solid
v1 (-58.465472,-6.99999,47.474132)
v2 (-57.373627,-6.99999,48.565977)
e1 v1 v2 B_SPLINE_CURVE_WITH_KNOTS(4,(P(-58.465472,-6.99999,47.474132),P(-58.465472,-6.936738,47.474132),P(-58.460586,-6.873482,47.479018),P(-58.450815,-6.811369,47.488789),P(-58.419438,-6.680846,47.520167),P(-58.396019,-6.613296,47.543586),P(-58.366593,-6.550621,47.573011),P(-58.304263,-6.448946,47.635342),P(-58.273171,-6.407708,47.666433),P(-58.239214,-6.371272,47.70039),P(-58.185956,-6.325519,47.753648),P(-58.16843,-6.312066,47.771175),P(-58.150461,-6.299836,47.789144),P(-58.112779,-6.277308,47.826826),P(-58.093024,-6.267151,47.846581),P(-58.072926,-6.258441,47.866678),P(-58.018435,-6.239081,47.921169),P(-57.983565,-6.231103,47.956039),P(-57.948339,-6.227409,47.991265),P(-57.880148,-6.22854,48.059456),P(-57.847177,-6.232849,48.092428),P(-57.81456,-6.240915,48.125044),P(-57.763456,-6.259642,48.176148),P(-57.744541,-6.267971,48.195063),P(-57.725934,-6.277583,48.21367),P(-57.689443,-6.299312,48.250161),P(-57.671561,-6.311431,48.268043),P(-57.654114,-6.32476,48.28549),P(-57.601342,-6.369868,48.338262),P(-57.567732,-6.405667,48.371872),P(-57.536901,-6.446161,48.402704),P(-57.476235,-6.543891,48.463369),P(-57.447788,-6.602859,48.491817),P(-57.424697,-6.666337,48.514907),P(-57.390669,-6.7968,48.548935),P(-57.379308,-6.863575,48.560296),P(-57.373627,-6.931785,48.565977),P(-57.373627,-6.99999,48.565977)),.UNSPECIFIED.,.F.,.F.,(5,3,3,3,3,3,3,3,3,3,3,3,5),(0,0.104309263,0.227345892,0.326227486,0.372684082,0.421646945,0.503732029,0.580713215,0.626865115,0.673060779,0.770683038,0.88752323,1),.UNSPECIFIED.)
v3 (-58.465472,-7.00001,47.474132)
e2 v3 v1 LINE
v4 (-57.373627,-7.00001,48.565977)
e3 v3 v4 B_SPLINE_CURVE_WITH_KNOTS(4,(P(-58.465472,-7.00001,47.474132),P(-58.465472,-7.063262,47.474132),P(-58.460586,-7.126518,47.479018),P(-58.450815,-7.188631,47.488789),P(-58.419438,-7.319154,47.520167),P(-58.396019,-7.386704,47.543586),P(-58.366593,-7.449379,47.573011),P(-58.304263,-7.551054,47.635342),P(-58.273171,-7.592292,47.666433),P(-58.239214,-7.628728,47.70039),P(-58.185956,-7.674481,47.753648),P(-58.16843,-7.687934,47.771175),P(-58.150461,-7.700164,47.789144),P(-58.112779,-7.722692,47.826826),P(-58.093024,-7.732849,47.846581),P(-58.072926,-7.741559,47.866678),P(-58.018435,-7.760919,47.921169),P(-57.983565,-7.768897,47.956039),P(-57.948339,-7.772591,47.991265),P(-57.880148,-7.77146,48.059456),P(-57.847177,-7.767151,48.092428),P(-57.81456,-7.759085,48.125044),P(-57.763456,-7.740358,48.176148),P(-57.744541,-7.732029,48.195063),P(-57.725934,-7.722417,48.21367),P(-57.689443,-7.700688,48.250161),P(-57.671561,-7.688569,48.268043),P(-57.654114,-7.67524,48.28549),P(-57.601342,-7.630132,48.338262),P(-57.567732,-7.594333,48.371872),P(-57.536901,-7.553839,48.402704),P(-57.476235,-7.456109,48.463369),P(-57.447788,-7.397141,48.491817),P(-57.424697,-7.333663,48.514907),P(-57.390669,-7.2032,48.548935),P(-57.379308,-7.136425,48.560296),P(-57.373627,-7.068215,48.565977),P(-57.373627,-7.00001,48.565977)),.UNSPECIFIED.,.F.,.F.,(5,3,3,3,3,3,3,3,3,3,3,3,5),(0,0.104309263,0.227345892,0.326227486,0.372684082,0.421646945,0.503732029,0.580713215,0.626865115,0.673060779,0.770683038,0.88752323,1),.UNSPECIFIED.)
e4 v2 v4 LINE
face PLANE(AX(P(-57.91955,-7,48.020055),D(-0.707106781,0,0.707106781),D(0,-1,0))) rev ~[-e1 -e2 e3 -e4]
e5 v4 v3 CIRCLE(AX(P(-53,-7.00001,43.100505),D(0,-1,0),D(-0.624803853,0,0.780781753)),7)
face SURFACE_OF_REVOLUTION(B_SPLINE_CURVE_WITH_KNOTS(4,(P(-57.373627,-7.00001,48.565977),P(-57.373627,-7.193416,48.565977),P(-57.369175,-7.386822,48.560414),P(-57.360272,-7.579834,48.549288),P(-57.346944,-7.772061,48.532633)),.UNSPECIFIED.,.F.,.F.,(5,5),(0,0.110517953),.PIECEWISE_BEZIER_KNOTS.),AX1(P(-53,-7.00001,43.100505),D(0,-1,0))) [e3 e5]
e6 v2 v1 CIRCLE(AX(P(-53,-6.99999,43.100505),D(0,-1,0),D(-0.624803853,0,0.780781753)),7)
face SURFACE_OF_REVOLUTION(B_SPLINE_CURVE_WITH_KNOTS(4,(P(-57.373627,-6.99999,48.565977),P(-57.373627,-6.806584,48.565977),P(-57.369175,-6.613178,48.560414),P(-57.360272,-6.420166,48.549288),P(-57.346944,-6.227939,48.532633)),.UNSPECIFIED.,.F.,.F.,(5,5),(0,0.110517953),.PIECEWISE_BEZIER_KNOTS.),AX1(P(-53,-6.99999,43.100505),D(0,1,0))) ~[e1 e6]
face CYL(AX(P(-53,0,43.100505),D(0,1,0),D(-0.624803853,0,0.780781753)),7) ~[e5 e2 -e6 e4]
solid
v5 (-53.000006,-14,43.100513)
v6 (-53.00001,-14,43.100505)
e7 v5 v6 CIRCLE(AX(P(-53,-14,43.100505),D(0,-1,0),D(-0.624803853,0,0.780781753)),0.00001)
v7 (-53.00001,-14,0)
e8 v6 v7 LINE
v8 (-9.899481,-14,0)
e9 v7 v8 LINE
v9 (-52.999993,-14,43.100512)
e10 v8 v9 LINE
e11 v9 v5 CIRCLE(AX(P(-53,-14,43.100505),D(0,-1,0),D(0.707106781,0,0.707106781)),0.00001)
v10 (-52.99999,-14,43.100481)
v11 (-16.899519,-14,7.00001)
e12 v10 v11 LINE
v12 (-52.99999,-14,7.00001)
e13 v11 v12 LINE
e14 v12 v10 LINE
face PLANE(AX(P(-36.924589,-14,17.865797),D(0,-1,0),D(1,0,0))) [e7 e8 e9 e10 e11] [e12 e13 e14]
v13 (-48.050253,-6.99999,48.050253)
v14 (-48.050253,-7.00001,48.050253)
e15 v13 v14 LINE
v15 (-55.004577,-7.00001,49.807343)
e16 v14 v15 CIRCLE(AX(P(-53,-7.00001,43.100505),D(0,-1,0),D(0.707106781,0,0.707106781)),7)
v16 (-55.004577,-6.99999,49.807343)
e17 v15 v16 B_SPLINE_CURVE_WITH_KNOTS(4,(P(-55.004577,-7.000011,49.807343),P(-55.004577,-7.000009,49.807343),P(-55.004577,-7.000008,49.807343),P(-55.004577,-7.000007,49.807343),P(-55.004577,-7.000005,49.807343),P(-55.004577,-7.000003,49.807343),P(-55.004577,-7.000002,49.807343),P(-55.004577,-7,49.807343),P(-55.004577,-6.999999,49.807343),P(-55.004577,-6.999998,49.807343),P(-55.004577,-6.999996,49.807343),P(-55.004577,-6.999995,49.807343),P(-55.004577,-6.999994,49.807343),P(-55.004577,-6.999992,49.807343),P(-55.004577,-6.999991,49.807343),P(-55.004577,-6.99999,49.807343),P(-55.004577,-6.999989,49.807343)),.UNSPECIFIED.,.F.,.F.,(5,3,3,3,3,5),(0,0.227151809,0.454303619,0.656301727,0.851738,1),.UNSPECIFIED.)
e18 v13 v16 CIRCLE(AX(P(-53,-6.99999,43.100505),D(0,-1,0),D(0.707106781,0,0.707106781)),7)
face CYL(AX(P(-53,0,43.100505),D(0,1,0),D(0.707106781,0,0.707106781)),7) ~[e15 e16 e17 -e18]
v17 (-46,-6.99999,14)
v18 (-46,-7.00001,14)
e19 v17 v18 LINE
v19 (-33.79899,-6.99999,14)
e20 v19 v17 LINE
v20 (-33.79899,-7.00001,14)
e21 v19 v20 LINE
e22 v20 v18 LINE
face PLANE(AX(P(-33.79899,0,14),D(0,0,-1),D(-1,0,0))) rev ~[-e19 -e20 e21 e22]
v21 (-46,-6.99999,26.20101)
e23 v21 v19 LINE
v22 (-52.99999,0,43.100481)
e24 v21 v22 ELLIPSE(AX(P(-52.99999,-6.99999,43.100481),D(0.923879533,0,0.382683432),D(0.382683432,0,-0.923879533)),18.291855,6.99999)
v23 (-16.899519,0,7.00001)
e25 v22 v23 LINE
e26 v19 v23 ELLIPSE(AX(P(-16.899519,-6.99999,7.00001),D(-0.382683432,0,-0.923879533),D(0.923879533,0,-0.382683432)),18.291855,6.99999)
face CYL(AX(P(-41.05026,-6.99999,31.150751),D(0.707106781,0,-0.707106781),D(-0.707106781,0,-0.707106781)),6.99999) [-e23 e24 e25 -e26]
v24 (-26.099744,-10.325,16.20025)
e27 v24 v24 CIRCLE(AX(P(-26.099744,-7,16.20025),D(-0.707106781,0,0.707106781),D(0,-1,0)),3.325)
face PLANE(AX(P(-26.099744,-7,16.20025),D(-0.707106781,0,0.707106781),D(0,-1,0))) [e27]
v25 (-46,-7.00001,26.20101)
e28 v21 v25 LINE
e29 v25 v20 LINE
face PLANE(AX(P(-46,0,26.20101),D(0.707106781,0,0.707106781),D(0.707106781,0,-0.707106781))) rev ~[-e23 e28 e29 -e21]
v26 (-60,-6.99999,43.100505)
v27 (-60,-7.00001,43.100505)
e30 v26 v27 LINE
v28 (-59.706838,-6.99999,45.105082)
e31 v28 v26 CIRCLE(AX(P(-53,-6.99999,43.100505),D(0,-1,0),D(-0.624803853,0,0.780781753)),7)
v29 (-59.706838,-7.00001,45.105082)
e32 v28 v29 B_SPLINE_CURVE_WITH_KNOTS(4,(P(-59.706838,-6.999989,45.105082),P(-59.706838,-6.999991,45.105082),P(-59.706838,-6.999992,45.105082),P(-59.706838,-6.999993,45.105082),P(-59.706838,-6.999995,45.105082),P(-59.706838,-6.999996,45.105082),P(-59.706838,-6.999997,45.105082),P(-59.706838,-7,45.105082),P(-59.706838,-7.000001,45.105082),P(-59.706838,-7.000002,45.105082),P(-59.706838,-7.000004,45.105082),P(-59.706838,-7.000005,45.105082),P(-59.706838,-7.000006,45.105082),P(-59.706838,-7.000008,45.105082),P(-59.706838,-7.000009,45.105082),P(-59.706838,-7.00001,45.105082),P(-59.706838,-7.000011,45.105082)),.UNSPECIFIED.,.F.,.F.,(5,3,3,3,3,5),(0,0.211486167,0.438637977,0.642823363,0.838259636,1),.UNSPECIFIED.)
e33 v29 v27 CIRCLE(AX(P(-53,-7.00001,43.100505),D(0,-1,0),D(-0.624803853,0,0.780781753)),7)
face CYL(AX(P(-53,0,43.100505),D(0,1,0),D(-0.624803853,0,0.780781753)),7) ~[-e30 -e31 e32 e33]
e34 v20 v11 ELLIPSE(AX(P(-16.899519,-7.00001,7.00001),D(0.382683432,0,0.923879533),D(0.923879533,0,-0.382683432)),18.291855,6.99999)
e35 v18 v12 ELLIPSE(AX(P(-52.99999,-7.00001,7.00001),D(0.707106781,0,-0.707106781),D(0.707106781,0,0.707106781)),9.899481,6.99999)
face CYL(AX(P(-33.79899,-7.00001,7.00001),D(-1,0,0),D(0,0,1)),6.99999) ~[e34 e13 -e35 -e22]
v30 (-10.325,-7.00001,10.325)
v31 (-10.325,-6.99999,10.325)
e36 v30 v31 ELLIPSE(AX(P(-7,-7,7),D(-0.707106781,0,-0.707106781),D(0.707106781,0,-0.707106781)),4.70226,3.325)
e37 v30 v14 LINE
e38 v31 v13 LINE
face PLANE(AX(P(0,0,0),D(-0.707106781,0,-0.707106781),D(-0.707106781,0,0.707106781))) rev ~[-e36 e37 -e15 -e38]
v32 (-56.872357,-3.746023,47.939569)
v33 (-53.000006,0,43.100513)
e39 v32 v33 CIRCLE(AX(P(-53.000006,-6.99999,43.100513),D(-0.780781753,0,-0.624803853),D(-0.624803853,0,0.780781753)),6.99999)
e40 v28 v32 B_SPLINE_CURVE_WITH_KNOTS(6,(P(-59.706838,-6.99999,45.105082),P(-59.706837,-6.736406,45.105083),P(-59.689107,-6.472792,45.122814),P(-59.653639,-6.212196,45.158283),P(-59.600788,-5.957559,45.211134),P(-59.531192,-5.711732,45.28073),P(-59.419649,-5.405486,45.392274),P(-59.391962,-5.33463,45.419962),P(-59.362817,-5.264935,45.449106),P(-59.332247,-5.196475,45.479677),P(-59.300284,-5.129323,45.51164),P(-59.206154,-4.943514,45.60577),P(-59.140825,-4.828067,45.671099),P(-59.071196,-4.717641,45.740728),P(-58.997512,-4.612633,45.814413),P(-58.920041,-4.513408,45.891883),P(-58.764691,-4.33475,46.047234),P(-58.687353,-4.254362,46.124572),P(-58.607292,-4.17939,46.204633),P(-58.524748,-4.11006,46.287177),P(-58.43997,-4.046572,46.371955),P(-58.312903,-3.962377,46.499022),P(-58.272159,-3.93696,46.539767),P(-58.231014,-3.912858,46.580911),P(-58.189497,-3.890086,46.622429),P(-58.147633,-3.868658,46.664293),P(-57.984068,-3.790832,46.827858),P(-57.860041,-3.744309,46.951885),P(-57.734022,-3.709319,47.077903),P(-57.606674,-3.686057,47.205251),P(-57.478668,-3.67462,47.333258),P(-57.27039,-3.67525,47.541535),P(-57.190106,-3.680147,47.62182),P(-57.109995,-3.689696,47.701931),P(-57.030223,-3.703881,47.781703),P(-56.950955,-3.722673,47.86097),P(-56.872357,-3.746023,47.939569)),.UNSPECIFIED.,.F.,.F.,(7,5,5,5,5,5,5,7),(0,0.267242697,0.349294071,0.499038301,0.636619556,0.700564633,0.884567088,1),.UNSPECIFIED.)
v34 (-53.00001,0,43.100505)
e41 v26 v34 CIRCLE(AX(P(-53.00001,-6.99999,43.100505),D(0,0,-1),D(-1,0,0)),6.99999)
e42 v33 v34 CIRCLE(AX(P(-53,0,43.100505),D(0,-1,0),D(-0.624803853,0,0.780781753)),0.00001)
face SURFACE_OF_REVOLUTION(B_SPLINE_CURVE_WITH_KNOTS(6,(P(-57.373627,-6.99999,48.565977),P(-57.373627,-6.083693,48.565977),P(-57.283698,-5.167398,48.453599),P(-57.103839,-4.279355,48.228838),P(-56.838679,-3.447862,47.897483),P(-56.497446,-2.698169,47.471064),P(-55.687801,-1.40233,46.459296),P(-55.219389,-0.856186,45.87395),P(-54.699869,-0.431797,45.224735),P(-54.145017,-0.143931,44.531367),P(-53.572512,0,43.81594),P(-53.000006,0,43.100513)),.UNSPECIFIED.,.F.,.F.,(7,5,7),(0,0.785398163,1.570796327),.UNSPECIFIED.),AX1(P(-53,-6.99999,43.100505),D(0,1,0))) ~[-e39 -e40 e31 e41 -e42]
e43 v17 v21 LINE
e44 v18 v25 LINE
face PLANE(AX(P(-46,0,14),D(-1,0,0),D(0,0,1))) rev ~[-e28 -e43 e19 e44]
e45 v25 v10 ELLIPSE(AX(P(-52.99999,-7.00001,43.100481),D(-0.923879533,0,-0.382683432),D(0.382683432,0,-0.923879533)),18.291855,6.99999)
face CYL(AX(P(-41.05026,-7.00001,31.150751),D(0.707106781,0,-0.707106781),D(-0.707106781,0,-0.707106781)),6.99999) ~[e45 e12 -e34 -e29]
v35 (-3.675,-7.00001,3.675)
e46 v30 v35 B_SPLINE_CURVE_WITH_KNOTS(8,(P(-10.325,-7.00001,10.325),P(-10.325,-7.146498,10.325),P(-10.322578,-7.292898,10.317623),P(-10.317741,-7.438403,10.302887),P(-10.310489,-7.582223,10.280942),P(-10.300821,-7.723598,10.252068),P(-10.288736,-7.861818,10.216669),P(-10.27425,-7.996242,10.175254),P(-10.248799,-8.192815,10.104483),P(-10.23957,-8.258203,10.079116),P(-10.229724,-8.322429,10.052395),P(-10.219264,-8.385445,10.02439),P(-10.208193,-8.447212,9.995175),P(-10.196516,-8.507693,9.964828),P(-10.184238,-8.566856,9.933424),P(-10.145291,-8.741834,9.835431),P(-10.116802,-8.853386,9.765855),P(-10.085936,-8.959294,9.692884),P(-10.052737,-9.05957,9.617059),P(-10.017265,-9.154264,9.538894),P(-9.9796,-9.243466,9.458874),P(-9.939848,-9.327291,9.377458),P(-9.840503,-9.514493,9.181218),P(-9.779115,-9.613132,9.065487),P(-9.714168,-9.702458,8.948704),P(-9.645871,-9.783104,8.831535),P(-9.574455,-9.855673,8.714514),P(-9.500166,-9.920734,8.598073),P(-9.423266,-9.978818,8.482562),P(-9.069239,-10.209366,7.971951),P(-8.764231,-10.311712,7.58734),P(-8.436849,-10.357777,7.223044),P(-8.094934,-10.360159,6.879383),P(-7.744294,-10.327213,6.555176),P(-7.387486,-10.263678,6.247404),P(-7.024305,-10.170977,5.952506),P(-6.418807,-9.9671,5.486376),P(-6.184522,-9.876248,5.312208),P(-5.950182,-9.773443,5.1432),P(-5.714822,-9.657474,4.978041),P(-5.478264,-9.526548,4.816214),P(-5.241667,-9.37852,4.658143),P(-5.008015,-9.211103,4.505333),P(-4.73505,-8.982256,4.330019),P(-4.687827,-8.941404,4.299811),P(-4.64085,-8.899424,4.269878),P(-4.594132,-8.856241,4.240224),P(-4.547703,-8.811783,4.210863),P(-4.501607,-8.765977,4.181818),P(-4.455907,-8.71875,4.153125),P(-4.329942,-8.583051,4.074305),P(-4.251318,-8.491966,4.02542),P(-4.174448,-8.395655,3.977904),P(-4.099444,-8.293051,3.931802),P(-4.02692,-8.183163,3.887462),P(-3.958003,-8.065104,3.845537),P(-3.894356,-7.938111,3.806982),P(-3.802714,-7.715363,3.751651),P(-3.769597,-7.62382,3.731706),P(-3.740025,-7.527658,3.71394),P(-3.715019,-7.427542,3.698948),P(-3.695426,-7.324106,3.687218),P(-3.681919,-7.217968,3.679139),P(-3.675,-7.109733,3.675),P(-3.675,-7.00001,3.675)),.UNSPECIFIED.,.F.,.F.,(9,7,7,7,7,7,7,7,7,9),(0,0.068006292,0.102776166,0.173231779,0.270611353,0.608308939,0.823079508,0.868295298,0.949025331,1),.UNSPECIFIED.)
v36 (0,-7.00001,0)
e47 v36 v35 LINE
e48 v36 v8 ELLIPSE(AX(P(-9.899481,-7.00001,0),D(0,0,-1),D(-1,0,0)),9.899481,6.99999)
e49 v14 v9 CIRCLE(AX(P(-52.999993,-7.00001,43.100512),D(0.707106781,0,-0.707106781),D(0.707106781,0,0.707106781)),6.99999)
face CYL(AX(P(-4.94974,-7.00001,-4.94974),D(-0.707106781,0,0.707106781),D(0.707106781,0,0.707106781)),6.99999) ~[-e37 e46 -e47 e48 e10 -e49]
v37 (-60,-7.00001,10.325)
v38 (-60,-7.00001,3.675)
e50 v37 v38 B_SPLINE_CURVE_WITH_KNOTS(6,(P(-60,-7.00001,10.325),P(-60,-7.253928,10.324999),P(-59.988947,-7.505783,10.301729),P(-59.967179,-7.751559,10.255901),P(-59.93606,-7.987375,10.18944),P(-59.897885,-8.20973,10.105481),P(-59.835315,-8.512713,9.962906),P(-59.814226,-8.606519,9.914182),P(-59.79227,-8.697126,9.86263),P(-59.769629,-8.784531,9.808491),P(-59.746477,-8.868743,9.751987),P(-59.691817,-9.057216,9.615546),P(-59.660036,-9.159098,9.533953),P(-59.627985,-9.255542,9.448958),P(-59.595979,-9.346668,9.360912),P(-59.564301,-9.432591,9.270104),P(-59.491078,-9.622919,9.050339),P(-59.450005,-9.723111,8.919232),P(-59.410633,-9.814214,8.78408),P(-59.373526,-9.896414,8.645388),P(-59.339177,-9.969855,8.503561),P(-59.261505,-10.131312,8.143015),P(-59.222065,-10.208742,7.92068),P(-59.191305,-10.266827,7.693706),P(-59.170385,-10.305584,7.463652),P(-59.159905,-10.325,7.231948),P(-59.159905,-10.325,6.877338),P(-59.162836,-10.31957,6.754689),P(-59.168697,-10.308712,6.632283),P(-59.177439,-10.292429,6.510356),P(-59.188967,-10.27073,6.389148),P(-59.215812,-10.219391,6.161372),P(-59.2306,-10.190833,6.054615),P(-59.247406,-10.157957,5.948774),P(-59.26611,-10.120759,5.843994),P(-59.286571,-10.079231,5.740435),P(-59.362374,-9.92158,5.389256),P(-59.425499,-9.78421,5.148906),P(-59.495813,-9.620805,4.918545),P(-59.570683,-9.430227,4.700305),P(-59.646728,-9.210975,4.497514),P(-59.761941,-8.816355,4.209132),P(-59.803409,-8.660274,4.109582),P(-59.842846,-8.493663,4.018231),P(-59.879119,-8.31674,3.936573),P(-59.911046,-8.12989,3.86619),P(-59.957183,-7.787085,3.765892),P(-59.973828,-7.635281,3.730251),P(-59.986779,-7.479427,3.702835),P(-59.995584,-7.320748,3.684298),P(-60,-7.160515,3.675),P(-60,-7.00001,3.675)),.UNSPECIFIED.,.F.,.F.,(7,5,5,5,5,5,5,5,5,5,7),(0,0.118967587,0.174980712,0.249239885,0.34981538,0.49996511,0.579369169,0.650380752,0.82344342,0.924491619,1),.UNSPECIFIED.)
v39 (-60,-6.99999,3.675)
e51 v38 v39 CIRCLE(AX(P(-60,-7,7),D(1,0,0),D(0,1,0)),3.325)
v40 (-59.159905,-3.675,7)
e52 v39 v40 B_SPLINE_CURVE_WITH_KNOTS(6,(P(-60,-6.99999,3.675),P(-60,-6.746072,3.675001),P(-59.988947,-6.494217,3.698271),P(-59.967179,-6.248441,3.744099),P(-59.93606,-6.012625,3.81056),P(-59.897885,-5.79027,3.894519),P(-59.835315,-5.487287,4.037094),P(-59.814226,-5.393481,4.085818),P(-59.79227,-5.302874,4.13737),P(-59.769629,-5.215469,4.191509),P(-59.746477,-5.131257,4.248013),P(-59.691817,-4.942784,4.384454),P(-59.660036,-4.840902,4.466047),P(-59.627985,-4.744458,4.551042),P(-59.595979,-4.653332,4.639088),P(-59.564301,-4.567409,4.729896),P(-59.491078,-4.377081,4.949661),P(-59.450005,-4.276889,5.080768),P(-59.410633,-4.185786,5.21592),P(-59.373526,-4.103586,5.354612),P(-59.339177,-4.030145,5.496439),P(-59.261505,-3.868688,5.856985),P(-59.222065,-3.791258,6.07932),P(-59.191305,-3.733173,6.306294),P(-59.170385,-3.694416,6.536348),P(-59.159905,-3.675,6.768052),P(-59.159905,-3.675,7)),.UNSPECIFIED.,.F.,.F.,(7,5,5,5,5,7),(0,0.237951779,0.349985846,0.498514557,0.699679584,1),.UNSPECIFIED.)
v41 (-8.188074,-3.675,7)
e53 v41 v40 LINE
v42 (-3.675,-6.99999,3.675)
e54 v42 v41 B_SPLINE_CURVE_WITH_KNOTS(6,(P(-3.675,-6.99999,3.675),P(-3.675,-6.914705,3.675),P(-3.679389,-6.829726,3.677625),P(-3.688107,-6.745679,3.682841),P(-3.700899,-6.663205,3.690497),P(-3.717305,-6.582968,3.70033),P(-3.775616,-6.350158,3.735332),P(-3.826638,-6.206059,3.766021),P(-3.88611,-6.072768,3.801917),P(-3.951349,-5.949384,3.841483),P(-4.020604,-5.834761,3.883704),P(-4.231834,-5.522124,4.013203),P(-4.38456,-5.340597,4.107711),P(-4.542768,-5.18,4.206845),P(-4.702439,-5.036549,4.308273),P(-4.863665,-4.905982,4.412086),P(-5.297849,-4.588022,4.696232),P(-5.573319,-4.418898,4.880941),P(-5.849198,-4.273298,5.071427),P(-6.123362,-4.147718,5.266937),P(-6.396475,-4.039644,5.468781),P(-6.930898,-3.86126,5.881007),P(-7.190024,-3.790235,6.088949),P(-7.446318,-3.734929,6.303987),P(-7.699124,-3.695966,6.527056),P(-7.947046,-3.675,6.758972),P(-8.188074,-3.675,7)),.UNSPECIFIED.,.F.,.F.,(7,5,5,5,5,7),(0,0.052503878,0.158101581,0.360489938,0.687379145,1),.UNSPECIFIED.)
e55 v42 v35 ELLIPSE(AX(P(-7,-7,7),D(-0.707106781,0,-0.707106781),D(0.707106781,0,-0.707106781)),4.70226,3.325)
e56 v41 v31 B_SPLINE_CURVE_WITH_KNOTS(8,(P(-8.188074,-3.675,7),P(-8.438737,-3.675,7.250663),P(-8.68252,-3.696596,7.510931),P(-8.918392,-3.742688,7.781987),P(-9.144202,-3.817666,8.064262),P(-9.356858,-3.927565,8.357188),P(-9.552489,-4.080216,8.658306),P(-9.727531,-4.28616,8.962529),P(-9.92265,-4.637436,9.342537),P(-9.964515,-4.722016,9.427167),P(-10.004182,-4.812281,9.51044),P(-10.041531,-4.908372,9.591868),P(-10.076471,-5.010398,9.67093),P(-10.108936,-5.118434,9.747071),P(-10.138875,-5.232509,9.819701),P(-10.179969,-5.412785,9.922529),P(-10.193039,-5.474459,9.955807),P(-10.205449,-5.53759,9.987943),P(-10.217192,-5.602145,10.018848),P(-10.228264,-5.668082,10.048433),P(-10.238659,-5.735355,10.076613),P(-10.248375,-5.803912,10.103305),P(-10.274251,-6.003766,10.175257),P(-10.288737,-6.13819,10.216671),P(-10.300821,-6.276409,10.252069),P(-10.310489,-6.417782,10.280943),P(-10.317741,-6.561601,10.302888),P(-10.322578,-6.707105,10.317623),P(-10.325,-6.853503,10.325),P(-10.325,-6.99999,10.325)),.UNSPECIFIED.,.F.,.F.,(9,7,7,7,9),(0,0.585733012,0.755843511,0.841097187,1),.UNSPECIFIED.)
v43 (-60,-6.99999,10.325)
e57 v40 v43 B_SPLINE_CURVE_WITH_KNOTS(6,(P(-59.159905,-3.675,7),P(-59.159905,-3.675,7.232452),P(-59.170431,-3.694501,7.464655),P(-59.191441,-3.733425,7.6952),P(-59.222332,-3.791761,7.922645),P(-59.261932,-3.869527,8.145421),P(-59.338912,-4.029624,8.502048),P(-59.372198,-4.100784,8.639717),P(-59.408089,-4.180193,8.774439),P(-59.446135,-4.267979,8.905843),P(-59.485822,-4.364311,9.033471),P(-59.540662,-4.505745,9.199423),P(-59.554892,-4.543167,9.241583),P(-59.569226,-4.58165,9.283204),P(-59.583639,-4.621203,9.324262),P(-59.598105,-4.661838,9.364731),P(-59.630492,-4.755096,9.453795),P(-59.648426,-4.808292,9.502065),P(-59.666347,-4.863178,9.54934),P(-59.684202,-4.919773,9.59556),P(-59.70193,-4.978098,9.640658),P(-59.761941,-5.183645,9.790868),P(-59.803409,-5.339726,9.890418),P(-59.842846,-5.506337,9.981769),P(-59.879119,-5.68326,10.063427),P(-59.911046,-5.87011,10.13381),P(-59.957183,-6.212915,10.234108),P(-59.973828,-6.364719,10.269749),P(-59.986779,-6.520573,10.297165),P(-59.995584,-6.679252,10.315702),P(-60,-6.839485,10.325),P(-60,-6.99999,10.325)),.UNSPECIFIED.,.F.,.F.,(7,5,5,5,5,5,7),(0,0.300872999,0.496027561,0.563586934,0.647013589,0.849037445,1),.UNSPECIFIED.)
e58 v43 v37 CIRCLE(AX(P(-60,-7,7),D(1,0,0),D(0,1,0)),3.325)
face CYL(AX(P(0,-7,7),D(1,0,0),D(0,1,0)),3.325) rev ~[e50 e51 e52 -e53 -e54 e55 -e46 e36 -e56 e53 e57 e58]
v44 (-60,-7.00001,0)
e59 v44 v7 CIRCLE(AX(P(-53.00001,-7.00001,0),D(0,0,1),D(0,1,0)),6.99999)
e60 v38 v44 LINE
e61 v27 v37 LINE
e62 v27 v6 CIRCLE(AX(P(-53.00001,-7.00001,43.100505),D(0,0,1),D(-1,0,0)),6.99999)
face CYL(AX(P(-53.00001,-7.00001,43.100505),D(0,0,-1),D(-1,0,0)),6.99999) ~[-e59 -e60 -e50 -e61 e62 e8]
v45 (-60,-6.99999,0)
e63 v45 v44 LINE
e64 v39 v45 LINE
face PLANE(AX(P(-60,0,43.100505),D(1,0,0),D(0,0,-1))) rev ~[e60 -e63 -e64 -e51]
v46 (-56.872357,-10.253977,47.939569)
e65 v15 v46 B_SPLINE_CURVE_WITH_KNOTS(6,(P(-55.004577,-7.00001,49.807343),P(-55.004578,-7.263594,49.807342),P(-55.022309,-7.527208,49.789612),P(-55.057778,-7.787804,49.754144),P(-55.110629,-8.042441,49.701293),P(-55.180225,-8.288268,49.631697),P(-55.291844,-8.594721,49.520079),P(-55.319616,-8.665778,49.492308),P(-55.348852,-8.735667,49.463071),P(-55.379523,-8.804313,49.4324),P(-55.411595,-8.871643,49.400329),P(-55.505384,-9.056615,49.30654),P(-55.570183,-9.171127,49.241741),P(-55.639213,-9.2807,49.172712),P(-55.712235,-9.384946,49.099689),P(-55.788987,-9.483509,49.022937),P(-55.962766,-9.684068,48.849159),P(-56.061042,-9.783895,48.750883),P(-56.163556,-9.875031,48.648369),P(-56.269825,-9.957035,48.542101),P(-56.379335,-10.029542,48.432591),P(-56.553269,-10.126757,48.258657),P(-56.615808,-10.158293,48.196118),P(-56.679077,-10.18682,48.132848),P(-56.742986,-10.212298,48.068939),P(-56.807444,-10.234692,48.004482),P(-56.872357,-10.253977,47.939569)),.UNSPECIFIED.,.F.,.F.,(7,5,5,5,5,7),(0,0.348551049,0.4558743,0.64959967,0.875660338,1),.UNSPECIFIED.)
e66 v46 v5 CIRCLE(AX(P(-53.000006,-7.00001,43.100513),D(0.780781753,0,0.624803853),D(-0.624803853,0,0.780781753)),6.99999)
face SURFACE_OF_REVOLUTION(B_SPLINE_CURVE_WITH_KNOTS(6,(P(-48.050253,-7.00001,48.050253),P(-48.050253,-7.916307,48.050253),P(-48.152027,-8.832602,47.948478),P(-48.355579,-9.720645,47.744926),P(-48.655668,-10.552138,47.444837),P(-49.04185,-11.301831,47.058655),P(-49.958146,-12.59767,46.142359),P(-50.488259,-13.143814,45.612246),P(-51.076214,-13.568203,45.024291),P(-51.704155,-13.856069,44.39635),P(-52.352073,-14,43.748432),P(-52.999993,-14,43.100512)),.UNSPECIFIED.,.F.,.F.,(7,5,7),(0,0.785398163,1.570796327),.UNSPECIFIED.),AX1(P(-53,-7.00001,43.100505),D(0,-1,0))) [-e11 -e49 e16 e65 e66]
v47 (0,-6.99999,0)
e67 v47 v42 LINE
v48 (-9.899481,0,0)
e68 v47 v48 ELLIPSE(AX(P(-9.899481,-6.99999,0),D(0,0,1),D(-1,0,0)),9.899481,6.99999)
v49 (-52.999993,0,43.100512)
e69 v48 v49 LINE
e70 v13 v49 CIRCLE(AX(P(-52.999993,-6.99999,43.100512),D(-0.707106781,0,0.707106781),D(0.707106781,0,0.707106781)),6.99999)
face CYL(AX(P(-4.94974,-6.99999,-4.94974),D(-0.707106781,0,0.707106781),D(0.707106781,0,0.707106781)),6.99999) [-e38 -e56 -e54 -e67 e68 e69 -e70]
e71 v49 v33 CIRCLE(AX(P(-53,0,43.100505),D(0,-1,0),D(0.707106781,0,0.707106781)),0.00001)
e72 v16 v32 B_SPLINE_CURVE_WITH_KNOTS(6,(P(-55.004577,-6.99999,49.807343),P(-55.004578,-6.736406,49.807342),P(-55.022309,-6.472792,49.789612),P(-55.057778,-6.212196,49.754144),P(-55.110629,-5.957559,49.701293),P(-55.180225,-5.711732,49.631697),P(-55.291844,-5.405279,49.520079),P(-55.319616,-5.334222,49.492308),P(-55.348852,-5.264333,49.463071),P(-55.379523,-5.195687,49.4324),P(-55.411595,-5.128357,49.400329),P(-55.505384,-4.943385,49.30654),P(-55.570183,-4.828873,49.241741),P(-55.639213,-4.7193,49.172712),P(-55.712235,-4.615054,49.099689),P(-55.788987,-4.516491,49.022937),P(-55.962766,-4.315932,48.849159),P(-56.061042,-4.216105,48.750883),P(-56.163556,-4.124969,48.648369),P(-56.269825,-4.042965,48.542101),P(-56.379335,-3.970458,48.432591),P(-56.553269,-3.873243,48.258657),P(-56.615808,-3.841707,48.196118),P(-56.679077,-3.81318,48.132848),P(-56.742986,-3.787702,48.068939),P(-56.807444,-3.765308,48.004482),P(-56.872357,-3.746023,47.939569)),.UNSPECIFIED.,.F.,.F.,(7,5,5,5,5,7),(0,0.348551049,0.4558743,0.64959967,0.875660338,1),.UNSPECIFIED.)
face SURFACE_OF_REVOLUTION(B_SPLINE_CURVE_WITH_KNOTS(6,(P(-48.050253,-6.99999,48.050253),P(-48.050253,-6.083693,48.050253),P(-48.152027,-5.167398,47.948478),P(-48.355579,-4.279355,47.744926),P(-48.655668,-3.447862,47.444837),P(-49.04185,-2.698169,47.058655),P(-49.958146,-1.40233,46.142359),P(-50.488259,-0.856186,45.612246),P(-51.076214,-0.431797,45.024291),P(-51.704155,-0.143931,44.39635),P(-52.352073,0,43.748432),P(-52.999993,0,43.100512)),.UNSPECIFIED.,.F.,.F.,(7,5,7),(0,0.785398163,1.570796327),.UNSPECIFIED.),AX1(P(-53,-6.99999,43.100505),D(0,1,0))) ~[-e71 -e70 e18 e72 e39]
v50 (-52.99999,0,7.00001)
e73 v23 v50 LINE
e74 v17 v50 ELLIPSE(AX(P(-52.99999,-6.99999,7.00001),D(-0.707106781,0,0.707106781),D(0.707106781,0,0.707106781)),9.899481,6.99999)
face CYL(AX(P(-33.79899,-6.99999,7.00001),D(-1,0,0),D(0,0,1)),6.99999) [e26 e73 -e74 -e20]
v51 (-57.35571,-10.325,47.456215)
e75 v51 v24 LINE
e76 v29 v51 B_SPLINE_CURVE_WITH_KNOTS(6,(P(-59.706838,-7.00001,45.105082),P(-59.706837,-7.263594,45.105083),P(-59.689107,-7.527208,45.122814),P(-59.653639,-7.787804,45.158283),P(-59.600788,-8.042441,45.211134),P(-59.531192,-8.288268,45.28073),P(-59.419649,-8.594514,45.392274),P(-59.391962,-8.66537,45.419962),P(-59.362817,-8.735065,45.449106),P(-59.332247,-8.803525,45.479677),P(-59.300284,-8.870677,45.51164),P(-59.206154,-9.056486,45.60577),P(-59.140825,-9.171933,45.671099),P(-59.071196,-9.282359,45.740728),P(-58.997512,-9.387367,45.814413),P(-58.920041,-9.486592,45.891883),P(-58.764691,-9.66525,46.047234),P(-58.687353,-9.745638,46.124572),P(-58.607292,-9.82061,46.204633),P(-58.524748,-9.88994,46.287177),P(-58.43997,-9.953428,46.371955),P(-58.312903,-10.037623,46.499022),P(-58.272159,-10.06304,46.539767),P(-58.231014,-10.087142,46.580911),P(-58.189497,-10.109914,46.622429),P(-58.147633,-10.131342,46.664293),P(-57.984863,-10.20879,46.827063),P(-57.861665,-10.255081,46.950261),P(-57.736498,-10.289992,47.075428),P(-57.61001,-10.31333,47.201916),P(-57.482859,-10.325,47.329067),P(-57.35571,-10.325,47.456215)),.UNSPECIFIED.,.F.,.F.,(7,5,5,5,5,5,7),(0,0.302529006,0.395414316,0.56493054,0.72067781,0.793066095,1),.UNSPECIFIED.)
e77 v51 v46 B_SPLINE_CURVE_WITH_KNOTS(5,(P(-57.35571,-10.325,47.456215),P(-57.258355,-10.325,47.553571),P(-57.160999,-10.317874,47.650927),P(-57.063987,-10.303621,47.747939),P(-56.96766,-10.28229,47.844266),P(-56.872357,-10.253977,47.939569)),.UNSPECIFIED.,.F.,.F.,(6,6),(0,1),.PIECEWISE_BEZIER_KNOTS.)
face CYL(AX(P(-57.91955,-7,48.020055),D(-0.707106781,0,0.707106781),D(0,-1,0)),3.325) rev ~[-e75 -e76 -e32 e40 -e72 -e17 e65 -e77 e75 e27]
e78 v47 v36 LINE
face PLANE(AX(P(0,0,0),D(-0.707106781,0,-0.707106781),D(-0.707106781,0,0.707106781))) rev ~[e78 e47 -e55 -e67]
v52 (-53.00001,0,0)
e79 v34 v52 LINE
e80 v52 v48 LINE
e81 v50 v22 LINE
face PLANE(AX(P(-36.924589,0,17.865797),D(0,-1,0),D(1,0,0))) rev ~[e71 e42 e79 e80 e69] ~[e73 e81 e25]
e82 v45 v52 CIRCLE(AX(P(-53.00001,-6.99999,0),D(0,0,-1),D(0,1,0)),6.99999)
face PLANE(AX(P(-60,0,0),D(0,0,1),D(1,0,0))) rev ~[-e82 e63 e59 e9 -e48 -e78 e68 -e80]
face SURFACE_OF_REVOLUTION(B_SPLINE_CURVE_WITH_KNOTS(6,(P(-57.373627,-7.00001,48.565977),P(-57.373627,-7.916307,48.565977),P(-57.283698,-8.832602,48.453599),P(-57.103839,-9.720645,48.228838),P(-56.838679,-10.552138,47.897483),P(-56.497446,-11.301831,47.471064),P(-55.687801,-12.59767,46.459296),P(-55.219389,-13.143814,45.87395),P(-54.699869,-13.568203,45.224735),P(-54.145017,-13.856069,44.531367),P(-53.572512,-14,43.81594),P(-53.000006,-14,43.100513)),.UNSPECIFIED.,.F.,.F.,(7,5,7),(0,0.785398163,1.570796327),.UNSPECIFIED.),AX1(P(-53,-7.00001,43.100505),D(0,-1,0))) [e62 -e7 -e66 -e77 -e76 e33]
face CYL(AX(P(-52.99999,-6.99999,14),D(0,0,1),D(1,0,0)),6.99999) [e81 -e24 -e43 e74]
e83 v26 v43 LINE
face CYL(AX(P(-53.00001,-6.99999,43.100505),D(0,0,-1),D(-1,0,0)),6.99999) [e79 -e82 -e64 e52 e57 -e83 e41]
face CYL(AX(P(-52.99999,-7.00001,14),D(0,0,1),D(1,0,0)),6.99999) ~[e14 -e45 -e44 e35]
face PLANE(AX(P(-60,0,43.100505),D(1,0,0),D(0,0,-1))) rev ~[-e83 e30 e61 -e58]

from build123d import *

# Parameters (mm, degrees)
F1_DEPTH = 14
F2_R     = 6.99999
F3_R     = 3.325
F4_DEPTH = 75
F6_R     = 3.325
F7_DEPTH = 45


# Not quite as in the source:
# - a fillet or chamfer is up to 0.001 mm smaller than in the source, because OpenCascade refuses the exact size


with BuildPart() as f1:
    # F0 (on Front) → F1 (new body)
    with BuildSketch(Plane.XZ):
        with BuildLine():
            Line((-60, 0), (0, 0))
            Line((0, 0), (-48.0502525317, 48.0502525317))
            ThreePointArc((-48.0502525317, 48.0502525317), (-52.6133842686, 50.0898203572), (-57.3736269721, 48.5659773311))
            ThreePointArc((-57.3736269721, 48.5659773311), (-59.3093339111, 46.1323865911), (-60, 43.1005050634))
            Line((-60, 43.1005050634), (-60, 0))
        make_face()
        Polygon((-33.7989898732, 14), (-46, 14), (-46, 26.2010101268), align=None, mode=Mode.SUBTRACT)
    extrude(amount=F1_DEPTH)

    # F2 (radius 7 in the source; OpenCascade refuses exactly that, so slightly less here)
    f2_edges = [f1.edges().sort_by_distance(p)[0] for p in [
        (-24.025126, -14, 24.025126),
        (-39.899495, -14, 20.100505),
        (-46, -14, 20.100505),
        (-39.899495, -14, 14),
        (-24.025126, 0, 24.025126),
        (-39.899495, 0, 20.100505),
        (-46, 0, 20.100505),
        (-39.899495, 0, 14),
    ]]
    fillet(f2_edges, radius=F2_R)

    # F3 (on Right) → F4 (cut)
    with BuildSketch(Plane.YZ):
        with Locations((-7, 7)):
            Circle(F3_R)
    extrude(amount=-F4_DEPTH, mode=Mode.SUBTRACT)

    # F6 (on face) → F7 (cut)
    with BuildSketch(Plane(origin=(-52.9698021516, 0, 52.9698021516), x_dir=(0, -1, 0), z_dir=(-0.7071067812, 0, 0.7071067812))):
        with Locations((7, -7)):
            Circle(F6_R)
    extrude(amount=-F7_DEPTH, mode=Mode.SUBTRACT)


solid = f1.part
